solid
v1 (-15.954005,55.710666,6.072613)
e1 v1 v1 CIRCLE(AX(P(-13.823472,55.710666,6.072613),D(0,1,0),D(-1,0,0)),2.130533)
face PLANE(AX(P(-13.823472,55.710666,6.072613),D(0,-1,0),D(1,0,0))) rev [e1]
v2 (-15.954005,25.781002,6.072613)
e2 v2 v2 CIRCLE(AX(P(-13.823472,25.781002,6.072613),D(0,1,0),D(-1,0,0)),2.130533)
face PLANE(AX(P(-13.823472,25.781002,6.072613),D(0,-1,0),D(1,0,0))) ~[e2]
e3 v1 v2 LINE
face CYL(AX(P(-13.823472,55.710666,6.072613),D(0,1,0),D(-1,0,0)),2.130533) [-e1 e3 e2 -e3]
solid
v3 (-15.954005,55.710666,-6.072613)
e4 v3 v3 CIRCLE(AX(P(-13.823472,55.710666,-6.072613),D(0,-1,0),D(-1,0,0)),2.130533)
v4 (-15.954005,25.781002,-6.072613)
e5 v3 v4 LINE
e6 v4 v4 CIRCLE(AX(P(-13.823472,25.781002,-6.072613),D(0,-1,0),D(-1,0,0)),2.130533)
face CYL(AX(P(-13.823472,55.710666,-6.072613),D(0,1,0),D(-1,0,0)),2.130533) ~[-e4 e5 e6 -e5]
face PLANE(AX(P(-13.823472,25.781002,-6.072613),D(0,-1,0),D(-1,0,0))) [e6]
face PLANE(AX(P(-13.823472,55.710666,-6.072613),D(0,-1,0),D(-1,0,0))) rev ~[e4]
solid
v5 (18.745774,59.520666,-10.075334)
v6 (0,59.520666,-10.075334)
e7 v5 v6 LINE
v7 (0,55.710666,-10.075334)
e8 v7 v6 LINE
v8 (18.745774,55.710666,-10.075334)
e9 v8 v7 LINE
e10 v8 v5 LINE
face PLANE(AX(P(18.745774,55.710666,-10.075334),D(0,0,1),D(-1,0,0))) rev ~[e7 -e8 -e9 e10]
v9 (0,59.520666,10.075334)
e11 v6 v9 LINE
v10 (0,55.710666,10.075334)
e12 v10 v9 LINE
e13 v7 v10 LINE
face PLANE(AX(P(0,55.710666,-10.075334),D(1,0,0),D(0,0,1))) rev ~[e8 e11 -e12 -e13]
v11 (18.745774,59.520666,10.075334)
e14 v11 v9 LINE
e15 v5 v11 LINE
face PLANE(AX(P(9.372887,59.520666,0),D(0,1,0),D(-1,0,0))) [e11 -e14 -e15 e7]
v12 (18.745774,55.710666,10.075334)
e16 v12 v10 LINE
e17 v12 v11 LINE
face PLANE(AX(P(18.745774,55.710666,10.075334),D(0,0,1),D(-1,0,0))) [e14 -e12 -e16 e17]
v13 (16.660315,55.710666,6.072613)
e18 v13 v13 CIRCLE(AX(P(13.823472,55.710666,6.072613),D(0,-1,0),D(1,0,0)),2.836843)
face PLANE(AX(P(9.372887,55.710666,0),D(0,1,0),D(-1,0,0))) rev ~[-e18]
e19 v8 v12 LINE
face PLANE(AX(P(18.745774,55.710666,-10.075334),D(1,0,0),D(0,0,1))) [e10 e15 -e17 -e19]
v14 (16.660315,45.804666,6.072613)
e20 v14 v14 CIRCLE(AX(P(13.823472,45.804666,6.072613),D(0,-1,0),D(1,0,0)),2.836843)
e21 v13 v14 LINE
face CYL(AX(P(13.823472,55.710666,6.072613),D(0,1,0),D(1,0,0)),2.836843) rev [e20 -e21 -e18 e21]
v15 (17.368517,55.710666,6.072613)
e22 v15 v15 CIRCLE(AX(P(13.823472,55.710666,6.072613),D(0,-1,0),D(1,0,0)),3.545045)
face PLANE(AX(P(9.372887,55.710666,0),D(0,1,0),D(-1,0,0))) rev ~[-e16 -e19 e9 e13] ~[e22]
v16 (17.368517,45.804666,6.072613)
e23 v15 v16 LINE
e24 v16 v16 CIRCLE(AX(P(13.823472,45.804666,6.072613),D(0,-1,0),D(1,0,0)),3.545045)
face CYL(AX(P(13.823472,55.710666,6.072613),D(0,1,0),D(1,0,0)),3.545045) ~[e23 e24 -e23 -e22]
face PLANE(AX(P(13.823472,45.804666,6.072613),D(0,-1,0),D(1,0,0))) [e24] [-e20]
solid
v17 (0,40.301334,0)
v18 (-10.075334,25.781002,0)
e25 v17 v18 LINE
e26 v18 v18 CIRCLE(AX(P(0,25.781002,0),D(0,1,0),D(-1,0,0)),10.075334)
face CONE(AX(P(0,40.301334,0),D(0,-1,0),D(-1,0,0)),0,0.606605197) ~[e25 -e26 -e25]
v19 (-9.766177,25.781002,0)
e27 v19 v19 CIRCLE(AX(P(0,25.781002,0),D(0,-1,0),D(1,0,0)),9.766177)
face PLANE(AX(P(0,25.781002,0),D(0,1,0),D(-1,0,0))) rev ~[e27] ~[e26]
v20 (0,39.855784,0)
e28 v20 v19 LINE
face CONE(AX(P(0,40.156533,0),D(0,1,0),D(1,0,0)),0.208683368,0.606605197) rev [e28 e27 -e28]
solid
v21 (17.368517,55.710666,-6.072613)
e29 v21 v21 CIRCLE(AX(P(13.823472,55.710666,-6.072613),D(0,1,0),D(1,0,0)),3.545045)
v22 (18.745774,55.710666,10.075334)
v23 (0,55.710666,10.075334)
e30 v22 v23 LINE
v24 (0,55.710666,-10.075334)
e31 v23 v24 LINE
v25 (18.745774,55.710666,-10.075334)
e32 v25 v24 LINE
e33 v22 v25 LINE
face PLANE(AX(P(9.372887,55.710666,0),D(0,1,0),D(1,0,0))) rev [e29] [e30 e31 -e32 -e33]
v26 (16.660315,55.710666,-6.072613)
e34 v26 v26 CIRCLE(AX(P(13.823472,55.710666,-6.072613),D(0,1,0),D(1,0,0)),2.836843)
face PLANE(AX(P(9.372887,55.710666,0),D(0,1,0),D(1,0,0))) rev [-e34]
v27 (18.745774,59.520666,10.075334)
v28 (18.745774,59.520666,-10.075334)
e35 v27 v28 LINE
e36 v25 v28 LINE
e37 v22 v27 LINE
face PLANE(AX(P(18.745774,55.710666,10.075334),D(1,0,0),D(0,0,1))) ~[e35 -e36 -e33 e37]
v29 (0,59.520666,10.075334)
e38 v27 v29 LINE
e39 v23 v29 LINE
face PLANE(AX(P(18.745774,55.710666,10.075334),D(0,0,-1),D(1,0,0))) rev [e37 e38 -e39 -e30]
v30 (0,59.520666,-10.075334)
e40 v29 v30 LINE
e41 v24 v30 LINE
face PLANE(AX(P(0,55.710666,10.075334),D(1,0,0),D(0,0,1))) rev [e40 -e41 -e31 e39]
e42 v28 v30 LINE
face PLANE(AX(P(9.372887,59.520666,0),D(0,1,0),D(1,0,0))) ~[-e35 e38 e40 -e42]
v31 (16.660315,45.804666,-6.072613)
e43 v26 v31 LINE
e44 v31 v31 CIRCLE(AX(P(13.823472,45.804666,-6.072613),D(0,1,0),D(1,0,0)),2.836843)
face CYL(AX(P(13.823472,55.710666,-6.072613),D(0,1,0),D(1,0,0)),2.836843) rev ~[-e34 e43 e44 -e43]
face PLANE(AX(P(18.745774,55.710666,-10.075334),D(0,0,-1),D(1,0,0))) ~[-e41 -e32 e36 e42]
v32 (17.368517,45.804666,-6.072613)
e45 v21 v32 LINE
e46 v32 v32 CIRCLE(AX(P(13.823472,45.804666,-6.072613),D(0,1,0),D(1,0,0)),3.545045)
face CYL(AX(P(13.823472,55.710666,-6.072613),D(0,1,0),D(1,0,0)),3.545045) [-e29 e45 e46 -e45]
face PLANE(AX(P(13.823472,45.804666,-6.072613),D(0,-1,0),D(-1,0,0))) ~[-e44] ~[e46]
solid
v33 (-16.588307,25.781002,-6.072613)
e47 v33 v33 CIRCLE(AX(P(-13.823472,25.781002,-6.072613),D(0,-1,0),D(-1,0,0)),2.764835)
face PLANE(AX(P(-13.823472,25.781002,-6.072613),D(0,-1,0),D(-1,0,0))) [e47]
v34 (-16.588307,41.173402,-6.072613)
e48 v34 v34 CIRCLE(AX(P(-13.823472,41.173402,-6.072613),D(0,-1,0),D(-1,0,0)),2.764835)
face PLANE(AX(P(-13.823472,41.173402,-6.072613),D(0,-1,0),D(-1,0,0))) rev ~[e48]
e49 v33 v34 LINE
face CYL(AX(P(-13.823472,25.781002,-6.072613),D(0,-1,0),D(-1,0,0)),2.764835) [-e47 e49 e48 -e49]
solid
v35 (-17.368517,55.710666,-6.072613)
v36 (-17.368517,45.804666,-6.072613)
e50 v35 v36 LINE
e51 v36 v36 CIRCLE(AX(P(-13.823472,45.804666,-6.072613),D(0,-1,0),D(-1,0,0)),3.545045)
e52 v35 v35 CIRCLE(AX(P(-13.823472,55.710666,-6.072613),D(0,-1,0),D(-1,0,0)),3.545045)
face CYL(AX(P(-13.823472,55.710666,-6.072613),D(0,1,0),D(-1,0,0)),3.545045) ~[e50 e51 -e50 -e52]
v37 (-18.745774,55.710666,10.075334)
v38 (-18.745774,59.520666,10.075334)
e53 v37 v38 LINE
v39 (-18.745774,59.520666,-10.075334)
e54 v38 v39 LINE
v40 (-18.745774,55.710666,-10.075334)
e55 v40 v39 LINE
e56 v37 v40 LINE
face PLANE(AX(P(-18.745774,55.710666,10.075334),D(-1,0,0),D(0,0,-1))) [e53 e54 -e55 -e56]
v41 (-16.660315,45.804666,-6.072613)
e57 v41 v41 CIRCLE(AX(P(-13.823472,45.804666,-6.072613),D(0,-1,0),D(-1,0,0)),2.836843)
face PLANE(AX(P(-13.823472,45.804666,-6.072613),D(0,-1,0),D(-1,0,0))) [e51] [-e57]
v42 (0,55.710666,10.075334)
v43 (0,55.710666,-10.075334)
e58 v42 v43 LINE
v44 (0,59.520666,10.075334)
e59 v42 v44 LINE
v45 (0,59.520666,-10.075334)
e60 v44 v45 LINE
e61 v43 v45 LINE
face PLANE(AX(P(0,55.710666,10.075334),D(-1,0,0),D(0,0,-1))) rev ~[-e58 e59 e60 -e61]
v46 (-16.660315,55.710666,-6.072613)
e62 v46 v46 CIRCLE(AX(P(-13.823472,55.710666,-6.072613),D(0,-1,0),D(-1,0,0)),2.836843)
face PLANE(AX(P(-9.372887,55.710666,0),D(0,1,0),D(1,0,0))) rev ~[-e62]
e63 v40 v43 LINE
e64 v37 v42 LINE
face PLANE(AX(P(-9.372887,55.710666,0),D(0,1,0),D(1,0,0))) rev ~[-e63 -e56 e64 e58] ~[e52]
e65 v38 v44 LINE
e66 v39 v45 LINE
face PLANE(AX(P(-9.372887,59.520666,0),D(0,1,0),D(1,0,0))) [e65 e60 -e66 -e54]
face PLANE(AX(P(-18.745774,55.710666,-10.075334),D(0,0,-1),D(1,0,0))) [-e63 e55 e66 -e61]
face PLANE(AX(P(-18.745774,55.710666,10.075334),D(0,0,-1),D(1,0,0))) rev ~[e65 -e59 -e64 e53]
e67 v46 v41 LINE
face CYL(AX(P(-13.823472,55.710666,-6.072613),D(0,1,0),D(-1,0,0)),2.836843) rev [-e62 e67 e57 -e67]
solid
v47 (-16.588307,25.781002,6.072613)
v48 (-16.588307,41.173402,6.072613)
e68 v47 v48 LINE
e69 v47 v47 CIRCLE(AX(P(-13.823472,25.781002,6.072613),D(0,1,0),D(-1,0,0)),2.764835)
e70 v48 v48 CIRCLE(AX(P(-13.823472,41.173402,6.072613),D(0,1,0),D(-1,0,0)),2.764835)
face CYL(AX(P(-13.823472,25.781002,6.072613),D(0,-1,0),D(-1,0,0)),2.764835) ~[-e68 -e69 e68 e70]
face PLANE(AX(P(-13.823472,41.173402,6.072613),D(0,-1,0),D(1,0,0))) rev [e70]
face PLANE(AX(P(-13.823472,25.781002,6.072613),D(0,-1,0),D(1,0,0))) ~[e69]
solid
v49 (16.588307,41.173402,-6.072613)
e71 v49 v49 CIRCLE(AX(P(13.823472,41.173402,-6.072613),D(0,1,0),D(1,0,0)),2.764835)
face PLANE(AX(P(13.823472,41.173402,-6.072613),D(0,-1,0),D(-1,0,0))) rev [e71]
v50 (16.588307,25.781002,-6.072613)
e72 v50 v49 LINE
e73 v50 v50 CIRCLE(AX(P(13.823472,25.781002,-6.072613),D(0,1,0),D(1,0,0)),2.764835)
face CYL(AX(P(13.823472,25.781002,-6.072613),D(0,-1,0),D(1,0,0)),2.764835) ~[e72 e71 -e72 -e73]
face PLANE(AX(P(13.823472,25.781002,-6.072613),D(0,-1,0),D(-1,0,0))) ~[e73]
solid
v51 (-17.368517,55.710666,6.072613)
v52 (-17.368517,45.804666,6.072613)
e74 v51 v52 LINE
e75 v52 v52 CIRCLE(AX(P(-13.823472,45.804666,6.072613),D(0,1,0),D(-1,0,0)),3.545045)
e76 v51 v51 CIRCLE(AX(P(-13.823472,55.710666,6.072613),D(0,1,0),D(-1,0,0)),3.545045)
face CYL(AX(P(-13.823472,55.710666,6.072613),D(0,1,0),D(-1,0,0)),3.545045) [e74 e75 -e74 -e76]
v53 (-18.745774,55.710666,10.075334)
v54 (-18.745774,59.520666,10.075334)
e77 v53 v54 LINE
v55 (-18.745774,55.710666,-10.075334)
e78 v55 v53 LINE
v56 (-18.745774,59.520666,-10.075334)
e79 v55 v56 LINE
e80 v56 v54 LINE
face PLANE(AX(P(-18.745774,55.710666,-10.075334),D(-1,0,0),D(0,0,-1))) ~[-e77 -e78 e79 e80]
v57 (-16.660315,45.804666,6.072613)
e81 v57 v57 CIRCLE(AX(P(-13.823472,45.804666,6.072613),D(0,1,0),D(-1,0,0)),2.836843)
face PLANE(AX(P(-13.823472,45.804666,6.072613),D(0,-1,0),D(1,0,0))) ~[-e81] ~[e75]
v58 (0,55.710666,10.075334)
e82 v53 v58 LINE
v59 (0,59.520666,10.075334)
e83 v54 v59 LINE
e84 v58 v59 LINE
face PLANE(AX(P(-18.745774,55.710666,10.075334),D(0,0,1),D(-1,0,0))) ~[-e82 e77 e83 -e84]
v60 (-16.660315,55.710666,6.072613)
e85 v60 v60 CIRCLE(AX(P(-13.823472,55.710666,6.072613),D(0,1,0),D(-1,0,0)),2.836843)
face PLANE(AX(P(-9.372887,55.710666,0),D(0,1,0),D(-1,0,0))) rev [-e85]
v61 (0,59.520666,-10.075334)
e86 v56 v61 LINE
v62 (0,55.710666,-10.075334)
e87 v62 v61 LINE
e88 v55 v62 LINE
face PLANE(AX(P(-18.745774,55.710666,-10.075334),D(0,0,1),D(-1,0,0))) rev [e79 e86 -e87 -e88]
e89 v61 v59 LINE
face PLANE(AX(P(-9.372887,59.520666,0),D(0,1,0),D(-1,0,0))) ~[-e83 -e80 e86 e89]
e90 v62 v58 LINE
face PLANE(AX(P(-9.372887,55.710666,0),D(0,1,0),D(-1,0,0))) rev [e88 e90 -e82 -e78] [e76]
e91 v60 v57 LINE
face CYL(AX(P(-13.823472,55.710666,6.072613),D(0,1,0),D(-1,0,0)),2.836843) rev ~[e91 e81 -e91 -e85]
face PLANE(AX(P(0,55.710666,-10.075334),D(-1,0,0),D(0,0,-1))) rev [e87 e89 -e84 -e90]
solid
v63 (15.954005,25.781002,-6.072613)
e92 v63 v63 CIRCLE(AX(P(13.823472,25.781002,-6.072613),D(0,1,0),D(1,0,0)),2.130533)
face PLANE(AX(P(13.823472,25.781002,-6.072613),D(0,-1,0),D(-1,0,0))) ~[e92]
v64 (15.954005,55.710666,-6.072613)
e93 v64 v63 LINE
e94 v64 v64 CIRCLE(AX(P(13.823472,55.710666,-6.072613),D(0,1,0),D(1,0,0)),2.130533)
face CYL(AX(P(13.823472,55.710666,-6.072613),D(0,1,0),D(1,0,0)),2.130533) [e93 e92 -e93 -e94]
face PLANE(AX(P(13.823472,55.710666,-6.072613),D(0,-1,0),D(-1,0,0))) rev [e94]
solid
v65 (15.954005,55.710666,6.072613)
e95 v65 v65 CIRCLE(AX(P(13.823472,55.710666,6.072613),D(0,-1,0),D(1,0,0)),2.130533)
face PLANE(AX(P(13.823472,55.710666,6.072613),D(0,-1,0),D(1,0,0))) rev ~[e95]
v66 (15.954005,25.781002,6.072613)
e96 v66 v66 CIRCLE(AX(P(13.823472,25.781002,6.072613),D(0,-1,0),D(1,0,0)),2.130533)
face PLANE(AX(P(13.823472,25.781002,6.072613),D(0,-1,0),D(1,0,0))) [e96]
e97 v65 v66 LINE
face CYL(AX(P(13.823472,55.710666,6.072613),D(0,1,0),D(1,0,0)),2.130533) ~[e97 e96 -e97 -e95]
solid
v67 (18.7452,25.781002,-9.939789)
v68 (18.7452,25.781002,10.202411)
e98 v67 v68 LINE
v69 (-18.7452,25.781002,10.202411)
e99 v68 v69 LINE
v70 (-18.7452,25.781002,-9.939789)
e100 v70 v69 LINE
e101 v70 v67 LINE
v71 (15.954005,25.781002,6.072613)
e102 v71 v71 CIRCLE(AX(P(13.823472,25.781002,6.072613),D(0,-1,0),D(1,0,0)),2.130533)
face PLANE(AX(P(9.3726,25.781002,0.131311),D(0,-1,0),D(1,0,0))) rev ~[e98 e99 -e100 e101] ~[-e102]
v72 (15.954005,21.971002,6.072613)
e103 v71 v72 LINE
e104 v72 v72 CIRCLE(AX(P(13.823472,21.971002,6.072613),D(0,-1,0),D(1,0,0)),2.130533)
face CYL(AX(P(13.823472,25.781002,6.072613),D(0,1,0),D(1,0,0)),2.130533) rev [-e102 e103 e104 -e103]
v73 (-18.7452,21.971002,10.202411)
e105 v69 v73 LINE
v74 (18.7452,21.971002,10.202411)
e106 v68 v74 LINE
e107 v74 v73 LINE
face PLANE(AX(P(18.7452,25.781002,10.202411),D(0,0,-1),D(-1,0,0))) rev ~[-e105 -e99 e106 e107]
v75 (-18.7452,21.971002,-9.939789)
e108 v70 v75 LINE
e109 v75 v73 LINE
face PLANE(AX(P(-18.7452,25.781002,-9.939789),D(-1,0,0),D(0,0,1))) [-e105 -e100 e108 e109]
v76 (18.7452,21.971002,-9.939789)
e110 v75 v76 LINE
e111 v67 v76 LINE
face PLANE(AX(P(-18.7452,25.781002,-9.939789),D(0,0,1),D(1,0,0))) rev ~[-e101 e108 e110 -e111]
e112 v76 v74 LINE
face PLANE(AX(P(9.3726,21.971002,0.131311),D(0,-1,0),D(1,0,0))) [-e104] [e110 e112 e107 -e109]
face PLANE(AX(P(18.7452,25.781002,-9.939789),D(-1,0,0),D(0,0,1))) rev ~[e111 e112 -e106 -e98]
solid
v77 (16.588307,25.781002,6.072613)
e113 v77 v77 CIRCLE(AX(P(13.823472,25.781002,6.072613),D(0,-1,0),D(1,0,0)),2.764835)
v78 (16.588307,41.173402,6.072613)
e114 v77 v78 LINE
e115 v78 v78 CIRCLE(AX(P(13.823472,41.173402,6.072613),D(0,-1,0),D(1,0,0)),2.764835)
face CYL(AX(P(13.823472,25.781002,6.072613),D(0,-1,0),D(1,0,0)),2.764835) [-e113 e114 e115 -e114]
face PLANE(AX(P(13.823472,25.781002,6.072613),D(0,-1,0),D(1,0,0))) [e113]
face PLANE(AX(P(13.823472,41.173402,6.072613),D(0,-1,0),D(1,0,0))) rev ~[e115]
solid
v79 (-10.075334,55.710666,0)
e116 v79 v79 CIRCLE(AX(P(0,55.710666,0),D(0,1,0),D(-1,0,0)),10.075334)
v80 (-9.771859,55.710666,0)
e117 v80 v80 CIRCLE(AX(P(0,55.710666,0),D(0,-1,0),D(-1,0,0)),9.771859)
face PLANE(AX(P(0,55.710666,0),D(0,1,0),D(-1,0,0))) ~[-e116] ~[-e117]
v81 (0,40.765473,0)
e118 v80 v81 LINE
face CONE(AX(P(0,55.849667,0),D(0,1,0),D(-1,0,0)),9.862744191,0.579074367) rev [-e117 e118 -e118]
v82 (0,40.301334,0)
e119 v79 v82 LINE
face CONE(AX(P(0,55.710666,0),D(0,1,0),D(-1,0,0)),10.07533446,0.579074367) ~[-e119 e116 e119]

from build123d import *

# Parameters (mm, degrees)
F2_T      = -0.254
F3_W      = 18.7457744032
F3_H      = 20.1506689191
F4_DEPTH  = 3.81
F5_R      = 2.130532704
F6_DEPTH  = 29.929663986
F5_R_2    = 3.5450449464
F5_R_3    = 2.8368433818
F8_DEPTH  = 9.906
F9_R      = 2.7648346721
F10_DEPTH = 15.3924
F14_T     = -0.254
F15_W     = 18.7452
F15_H     = 20.1422
F15_R     = 2.130532704
F16_DEPTH = 3.81


# Not quite as in the source:
# - the program builds the solid bodies; features that only make, move or delete a surface that nothing else refers to are left out


with BuildPart() as f1:
    # F0 (on Top) → F1 (revolve)
    with BuildSketch(Plane.XY):
        Polygon((-10.0753344595, 55.7106658816), (0, 40.3013341129), (0, 55.7106658816), align=None)
    revolve(axis=Axis((0, 48.0059999973, 0), (0, 1, 0)))

    # F2
    f2_openings = [f1.faces().sort_by_distance(p)[0] for p in [
        (0, 55.710666, 0),
    ]]
    offset(amount=F2_T, openings=f2_openings)


with BuildPart() as f1b:
    # F0 (on Top) → F1, piece 2 (revolve)
    with BuildSketch(Plane.XY):
        Polygon((-10.0753344595, 25.7810018957), (0, 25.7810018957), (0, 40.3013341129), align=None)
    revolve(axis=Axis((0, 48.0059999973, 0), (0, 1, 0)))

    # F14
    f14_openings = [f1b.faces().sort_by_distance(p)[0] for p in [
        (0, 25.781002, 0),
    ]]
    offset(amount=F14_T, openings=f14_openings)


with BuildPart() as f4:
    # F3 (on face) → F4 (new body)
    with BuildSketch(Plane(origin=(0, 55.7106658816, 0), x_dir=(-1, 0, 0), z_dir=(0, 1, 0))):
        with Locations((-9.3728872016, 0)):
            Rectangle(F3_W, F3_H)
    extrude(amount=F4_DEPTH)

    # F5 (on face) → F8 (join)
    with BuildSketch(Plane.XZ.offset(-55.7106658816)):
        with Locations((13.8234719634, 6.072612945)):
            Circle(F5_R_2)
        with Locations((13.8234719634, 6.072612945)):
            Circle(F5_R_3, mode=Mode.SUBTRACT)
    extrude(amount=F8_DEPTH)


with BuildPart() as f6:
    # F5 (on face) → F6 (new body, through all)
    with BuildSketch(Plane.XZ.offset(-55.7106658816)):
        with Locations((13.8234719634, 6.072612945)):
            Circle(F5_R)
    extrude(amount=F6_DEPTH)


with BuildPart() as f10:
    # F9 (on face) → F10 (new body)
    with BuildSketch(Plane.XZ.offset(-25.7810018957)):
        with Locations((13.8234719634, 6.072612945)):
            Circle(F9_R)
    extrude(amount=-F10_DEPTH)


with BuildPart() as f11_1:
    # F11: instance of F4
    add(f4.part.mirror(Plane(origin=(0, 57.6156658816, 0), x_dir=(0, -1, 0), z_dir=(-1, 0, 0))))


with BuildPart() as f11_2:
    # F11: instance of F6
    add(f6.part.mirror(Plane(origin=(0, 57.6156658816, 0), x_dir=(0, -1, 0), z_dir=(-1, 0, 0))))


with BuildPart() as f11_3:
    # F11: instance of F10
    add(f10.part.mirror(Plane(origin=(0, 57.6156658816, 0), x_dir=(0, -1, 0), z_dir=(-1, 0, 0))))


with BuildPart() as f12_1:
    # F12: instance of F6
    add(f6.part.mirror(Plane.XY))


with BuildPart() as f12_2:
    # F12: instance of F10
    add(f10.part.mirror(Plane.XY))


with BuildPart() as f12_3:
    # F12: instance of F4
    add(f4.part.mirror(Plane.XY))


with BuildPart() as f13_1:
    # F13: instance of F11_1
    add(f11_1.part.mirror(Plane.XY))


with BuildPart() as f13_2:
    # F13: instance of F11_2
    add(f11_2.part.mirror(Plane.XY))


with BuildPart() as f13_3:
    # F13: instance of F11_3
    add(f11_3.part.mirror(Plane.XY))


with BuildPart() as f16:
    # F15 (on face) → F16 (new body)
    with BuildSketch(Plane.XZ.offset(-25.7810018957)):
        with Locations((9.3726, 0.1313106309)):
            Rectangle(F15_W, F15_H)
        with Locations((13.8234719634, 6.072612945)):
            Circle(F15_R, mode=Mode.SUBTRACT)
        with Locations((-9.3726, 0.1313106309)):
            Rectangle(F15_W, F15_H)
    extrude(amount=F16_DEPTH)


solid = Compound([f1.part, f1b.part, f4.part, f6.part, f10.part, f11_1.part, f11_2.part, f11_3.part, f12_1.part, f12_2.part, f12_3.part, f13_1.part, f13_2.part, f13_3.part, f16.part])
